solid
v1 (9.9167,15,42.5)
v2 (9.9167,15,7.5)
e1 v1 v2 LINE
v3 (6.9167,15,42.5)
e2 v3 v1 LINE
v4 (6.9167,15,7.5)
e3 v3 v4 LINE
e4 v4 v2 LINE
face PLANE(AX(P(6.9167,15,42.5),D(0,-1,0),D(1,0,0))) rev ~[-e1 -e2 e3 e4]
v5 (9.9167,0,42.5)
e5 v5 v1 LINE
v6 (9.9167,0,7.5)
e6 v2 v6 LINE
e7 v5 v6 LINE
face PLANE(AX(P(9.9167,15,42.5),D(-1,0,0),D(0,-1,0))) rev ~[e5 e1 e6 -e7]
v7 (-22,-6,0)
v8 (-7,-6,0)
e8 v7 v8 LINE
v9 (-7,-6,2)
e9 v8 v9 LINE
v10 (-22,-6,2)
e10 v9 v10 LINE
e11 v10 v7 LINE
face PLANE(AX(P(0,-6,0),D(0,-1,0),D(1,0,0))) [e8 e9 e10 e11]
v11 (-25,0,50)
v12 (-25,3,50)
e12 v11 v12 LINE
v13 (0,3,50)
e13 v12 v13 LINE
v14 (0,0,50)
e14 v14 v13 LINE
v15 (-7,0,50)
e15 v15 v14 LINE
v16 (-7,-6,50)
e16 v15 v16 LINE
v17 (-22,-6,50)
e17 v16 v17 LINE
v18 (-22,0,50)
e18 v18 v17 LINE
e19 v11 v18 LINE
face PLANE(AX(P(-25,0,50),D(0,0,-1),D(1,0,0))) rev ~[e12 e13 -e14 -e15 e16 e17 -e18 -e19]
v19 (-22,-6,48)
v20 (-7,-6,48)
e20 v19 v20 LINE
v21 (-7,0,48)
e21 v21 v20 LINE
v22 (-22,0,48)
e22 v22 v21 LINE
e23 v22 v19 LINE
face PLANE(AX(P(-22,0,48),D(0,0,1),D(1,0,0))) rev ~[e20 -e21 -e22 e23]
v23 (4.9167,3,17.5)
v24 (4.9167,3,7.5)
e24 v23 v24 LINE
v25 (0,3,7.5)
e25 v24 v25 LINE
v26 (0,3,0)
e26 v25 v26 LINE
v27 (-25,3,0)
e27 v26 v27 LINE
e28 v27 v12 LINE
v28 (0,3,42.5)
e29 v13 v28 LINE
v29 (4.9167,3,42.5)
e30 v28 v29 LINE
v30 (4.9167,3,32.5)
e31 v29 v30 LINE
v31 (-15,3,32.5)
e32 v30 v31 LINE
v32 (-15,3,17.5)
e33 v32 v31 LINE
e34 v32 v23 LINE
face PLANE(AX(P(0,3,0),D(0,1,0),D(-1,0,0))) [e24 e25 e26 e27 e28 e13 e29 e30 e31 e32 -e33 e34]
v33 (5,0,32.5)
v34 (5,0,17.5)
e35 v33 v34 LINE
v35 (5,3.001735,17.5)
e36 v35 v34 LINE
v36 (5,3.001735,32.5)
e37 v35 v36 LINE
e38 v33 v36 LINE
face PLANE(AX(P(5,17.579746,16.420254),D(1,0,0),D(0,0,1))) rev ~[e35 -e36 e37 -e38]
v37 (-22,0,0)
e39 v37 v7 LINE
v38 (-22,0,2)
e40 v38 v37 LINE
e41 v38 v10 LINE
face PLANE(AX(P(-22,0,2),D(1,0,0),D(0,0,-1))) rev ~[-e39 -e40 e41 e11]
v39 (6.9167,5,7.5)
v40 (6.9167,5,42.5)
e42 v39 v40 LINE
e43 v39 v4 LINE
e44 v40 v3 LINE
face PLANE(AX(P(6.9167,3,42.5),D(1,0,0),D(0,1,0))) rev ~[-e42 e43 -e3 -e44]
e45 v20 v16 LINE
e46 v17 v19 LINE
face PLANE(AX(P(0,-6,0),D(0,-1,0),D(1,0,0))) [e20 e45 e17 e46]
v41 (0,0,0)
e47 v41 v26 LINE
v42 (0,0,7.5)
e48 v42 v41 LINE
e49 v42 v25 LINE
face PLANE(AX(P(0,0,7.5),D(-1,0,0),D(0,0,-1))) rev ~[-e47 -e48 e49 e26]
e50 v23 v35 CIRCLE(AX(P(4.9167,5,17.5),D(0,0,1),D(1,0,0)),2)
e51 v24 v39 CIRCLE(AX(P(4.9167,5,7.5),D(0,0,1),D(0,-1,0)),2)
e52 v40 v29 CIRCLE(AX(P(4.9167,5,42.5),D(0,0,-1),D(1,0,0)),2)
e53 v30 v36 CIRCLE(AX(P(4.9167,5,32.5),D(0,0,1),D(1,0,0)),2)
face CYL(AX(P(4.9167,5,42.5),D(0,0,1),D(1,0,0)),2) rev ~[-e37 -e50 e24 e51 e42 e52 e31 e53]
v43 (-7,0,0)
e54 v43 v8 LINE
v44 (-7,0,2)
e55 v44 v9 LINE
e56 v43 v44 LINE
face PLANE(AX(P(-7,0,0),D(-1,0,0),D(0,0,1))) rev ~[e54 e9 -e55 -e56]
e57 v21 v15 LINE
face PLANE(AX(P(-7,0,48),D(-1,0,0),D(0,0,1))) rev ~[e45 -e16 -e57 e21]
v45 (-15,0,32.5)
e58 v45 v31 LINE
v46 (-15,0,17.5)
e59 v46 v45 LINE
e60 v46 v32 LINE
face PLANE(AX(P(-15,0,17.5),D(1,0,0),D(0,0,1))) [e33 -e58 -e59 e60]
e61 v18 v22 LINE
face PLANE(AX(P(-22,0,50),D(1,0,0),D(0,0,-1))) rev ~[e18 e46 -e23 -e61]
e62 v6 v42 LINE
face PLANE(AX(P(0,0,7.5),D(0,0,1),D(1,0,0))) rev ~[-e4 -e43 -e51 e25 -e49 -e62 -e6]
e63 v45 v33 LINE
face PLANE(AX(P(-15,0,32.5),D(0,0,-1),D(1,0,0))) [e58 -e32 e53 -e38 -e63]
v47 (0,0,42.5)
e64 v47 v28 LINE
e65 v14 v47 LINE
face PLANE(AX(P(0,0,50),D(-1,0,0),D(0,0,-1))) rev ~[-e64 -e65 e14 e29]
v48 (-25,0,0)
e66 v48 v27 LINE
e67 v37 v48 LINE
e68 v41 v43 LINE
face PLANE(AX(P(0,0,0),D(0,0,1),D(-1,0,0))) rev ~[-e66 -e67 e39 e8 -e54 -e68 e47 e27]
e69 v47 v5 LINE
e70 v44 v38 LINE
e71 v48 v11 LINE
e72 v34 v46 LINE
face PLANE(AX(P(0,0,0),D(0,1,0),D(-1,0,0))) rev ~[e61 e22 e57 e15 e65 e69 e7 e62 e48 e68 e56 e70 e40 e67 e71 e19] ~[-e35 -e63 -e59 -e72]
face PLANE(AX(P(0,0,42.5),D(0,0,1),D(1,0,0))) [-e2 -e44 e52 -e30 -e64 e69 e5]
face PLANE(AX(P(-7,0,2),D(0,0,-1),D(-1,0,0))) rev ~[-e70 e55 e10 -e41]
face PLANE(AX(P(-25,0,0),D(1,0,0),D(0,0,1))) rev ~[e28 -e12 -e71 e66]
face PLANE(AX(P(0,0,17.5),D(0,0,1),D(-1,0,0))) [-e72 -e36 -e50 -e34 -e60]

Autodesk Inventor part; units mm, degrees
ref_plane "YZ Plane" through (0, 0, 0) normal (1, 0, 0) x (0, 1, 0)
ref_plane "XZ Plane" through (0, 0, 0) normal (0, 1, 0) x (-1, 0, 0)
ref_plane "XY Plane" through (0, 0, 0) normal (0, 0, 1) x (1, 0, 0)
sketch "Skizze1" plane through (0, 0, 0) normal (0, 1, 0) x (-1, 0, 0)
  line L0 (0, 0) -> (25, 0)
  line L1 (25, 0) -> (25, 50)
  line L2 (25, 50) -> (0, 50)
  line L3 (0, 42.5) -> (-9.9167, 42.5)
  line L4 (-9.9167, 42.5) -> (-9.9167, 7.5)
  line L5 (-9.9167, 7.5) -> (0, 7.5)
  line L6 (15, 32.5) -> (-5, 32.5)
  line L7 (-5, 32.5) -> (-5, 17.5)
  line L8 (-5, 17.5) -> (15, 17.5)
  line L9 (15, 17.5) -> (15, 32.5)
  line L10 (0, 7.5) -> (0, 17.5)
  line L11 (0, 32.5) -> (0, 42.5)
  line L12 (0, 50) -> (0, 32.5)
  line L13 (0, 17.5) -> (0, 0)
  dimension "d0" = 50
  dimension "d1" = 25
  dimension "d2" = 7.5
  dimension "d4" = 35
  dimension "d5" = 10
  dimension "d6" = 15
  dimension "d8" = 20
  dimension "d9" = 15
extrude "Extrusion1" add sketch "Skizze1" along normal blind 3 contours L13 L10 L8 L9 L6 L11 L12 L2 L1 L0 | L5 L4 L3 L11 L6 L7 L8 L10
sketch "Skizze2" plane through (0, 0, 42.5) normal (0, 0, 1) x (1, 0, 0)
  line L0 (9.9167, 0) -> (9.9167, 3) projected
  line L1 (9.9167, 3) -> (6.9167, 3)
  line L2 (6.9167, 3) -> (6.9167, 15)
  line L3 (6.9167, 15) -> (9.9167, 15)
  line L4 (9.9167, 15) -> (9.9167, 3)
  point P0 (0, 0)
  dimension "d12" = 3
  dimension "d13" = 12
extrude "Extrusion2" add sketch "Skizze2" against normal up to surface (35 mm away)
fillet "Rundung1" radius 2 1 edges at (6.9167, 3, 25)
sketch "Skizze3" plane through (0, 0, 0) normal (0, -1, 0) x (1, 0, 0)
  line L0 (-22, 0) -> (-7, 0)
  line L1 (-7, 0) -> (-7, 2)
  line L2 (-7, 2) -> (-22, 2)
  line L3 (-22, 2) -> (-22, 0)
  line L4 (-22, 48) -> (-7, 48)
  line L5 (-7, 48) -> (-7, 50)
  line L6 (-7, 50) -> (-22, 50)
  line L7 (-22, 50) -> (-22, 48)
  line L8 (-25, 50) -> (0, 50) projected
  line L9 (0, 50) -> (0, 42.5) projected
  point P0 (0, 0)
  dimension "d17" = 2
  dimension "d18" = 2
  dimension "d19" = 46
  dimension "d20" = 15
  dimension "d21" = 15
  dimension "d22" = 0
  dimension "d23" = 7
extrude "Extrusion3" add sketch "Skizze3" along normal blind 6
properties part number "Ultrasonic" material "Stahl, Guss"
